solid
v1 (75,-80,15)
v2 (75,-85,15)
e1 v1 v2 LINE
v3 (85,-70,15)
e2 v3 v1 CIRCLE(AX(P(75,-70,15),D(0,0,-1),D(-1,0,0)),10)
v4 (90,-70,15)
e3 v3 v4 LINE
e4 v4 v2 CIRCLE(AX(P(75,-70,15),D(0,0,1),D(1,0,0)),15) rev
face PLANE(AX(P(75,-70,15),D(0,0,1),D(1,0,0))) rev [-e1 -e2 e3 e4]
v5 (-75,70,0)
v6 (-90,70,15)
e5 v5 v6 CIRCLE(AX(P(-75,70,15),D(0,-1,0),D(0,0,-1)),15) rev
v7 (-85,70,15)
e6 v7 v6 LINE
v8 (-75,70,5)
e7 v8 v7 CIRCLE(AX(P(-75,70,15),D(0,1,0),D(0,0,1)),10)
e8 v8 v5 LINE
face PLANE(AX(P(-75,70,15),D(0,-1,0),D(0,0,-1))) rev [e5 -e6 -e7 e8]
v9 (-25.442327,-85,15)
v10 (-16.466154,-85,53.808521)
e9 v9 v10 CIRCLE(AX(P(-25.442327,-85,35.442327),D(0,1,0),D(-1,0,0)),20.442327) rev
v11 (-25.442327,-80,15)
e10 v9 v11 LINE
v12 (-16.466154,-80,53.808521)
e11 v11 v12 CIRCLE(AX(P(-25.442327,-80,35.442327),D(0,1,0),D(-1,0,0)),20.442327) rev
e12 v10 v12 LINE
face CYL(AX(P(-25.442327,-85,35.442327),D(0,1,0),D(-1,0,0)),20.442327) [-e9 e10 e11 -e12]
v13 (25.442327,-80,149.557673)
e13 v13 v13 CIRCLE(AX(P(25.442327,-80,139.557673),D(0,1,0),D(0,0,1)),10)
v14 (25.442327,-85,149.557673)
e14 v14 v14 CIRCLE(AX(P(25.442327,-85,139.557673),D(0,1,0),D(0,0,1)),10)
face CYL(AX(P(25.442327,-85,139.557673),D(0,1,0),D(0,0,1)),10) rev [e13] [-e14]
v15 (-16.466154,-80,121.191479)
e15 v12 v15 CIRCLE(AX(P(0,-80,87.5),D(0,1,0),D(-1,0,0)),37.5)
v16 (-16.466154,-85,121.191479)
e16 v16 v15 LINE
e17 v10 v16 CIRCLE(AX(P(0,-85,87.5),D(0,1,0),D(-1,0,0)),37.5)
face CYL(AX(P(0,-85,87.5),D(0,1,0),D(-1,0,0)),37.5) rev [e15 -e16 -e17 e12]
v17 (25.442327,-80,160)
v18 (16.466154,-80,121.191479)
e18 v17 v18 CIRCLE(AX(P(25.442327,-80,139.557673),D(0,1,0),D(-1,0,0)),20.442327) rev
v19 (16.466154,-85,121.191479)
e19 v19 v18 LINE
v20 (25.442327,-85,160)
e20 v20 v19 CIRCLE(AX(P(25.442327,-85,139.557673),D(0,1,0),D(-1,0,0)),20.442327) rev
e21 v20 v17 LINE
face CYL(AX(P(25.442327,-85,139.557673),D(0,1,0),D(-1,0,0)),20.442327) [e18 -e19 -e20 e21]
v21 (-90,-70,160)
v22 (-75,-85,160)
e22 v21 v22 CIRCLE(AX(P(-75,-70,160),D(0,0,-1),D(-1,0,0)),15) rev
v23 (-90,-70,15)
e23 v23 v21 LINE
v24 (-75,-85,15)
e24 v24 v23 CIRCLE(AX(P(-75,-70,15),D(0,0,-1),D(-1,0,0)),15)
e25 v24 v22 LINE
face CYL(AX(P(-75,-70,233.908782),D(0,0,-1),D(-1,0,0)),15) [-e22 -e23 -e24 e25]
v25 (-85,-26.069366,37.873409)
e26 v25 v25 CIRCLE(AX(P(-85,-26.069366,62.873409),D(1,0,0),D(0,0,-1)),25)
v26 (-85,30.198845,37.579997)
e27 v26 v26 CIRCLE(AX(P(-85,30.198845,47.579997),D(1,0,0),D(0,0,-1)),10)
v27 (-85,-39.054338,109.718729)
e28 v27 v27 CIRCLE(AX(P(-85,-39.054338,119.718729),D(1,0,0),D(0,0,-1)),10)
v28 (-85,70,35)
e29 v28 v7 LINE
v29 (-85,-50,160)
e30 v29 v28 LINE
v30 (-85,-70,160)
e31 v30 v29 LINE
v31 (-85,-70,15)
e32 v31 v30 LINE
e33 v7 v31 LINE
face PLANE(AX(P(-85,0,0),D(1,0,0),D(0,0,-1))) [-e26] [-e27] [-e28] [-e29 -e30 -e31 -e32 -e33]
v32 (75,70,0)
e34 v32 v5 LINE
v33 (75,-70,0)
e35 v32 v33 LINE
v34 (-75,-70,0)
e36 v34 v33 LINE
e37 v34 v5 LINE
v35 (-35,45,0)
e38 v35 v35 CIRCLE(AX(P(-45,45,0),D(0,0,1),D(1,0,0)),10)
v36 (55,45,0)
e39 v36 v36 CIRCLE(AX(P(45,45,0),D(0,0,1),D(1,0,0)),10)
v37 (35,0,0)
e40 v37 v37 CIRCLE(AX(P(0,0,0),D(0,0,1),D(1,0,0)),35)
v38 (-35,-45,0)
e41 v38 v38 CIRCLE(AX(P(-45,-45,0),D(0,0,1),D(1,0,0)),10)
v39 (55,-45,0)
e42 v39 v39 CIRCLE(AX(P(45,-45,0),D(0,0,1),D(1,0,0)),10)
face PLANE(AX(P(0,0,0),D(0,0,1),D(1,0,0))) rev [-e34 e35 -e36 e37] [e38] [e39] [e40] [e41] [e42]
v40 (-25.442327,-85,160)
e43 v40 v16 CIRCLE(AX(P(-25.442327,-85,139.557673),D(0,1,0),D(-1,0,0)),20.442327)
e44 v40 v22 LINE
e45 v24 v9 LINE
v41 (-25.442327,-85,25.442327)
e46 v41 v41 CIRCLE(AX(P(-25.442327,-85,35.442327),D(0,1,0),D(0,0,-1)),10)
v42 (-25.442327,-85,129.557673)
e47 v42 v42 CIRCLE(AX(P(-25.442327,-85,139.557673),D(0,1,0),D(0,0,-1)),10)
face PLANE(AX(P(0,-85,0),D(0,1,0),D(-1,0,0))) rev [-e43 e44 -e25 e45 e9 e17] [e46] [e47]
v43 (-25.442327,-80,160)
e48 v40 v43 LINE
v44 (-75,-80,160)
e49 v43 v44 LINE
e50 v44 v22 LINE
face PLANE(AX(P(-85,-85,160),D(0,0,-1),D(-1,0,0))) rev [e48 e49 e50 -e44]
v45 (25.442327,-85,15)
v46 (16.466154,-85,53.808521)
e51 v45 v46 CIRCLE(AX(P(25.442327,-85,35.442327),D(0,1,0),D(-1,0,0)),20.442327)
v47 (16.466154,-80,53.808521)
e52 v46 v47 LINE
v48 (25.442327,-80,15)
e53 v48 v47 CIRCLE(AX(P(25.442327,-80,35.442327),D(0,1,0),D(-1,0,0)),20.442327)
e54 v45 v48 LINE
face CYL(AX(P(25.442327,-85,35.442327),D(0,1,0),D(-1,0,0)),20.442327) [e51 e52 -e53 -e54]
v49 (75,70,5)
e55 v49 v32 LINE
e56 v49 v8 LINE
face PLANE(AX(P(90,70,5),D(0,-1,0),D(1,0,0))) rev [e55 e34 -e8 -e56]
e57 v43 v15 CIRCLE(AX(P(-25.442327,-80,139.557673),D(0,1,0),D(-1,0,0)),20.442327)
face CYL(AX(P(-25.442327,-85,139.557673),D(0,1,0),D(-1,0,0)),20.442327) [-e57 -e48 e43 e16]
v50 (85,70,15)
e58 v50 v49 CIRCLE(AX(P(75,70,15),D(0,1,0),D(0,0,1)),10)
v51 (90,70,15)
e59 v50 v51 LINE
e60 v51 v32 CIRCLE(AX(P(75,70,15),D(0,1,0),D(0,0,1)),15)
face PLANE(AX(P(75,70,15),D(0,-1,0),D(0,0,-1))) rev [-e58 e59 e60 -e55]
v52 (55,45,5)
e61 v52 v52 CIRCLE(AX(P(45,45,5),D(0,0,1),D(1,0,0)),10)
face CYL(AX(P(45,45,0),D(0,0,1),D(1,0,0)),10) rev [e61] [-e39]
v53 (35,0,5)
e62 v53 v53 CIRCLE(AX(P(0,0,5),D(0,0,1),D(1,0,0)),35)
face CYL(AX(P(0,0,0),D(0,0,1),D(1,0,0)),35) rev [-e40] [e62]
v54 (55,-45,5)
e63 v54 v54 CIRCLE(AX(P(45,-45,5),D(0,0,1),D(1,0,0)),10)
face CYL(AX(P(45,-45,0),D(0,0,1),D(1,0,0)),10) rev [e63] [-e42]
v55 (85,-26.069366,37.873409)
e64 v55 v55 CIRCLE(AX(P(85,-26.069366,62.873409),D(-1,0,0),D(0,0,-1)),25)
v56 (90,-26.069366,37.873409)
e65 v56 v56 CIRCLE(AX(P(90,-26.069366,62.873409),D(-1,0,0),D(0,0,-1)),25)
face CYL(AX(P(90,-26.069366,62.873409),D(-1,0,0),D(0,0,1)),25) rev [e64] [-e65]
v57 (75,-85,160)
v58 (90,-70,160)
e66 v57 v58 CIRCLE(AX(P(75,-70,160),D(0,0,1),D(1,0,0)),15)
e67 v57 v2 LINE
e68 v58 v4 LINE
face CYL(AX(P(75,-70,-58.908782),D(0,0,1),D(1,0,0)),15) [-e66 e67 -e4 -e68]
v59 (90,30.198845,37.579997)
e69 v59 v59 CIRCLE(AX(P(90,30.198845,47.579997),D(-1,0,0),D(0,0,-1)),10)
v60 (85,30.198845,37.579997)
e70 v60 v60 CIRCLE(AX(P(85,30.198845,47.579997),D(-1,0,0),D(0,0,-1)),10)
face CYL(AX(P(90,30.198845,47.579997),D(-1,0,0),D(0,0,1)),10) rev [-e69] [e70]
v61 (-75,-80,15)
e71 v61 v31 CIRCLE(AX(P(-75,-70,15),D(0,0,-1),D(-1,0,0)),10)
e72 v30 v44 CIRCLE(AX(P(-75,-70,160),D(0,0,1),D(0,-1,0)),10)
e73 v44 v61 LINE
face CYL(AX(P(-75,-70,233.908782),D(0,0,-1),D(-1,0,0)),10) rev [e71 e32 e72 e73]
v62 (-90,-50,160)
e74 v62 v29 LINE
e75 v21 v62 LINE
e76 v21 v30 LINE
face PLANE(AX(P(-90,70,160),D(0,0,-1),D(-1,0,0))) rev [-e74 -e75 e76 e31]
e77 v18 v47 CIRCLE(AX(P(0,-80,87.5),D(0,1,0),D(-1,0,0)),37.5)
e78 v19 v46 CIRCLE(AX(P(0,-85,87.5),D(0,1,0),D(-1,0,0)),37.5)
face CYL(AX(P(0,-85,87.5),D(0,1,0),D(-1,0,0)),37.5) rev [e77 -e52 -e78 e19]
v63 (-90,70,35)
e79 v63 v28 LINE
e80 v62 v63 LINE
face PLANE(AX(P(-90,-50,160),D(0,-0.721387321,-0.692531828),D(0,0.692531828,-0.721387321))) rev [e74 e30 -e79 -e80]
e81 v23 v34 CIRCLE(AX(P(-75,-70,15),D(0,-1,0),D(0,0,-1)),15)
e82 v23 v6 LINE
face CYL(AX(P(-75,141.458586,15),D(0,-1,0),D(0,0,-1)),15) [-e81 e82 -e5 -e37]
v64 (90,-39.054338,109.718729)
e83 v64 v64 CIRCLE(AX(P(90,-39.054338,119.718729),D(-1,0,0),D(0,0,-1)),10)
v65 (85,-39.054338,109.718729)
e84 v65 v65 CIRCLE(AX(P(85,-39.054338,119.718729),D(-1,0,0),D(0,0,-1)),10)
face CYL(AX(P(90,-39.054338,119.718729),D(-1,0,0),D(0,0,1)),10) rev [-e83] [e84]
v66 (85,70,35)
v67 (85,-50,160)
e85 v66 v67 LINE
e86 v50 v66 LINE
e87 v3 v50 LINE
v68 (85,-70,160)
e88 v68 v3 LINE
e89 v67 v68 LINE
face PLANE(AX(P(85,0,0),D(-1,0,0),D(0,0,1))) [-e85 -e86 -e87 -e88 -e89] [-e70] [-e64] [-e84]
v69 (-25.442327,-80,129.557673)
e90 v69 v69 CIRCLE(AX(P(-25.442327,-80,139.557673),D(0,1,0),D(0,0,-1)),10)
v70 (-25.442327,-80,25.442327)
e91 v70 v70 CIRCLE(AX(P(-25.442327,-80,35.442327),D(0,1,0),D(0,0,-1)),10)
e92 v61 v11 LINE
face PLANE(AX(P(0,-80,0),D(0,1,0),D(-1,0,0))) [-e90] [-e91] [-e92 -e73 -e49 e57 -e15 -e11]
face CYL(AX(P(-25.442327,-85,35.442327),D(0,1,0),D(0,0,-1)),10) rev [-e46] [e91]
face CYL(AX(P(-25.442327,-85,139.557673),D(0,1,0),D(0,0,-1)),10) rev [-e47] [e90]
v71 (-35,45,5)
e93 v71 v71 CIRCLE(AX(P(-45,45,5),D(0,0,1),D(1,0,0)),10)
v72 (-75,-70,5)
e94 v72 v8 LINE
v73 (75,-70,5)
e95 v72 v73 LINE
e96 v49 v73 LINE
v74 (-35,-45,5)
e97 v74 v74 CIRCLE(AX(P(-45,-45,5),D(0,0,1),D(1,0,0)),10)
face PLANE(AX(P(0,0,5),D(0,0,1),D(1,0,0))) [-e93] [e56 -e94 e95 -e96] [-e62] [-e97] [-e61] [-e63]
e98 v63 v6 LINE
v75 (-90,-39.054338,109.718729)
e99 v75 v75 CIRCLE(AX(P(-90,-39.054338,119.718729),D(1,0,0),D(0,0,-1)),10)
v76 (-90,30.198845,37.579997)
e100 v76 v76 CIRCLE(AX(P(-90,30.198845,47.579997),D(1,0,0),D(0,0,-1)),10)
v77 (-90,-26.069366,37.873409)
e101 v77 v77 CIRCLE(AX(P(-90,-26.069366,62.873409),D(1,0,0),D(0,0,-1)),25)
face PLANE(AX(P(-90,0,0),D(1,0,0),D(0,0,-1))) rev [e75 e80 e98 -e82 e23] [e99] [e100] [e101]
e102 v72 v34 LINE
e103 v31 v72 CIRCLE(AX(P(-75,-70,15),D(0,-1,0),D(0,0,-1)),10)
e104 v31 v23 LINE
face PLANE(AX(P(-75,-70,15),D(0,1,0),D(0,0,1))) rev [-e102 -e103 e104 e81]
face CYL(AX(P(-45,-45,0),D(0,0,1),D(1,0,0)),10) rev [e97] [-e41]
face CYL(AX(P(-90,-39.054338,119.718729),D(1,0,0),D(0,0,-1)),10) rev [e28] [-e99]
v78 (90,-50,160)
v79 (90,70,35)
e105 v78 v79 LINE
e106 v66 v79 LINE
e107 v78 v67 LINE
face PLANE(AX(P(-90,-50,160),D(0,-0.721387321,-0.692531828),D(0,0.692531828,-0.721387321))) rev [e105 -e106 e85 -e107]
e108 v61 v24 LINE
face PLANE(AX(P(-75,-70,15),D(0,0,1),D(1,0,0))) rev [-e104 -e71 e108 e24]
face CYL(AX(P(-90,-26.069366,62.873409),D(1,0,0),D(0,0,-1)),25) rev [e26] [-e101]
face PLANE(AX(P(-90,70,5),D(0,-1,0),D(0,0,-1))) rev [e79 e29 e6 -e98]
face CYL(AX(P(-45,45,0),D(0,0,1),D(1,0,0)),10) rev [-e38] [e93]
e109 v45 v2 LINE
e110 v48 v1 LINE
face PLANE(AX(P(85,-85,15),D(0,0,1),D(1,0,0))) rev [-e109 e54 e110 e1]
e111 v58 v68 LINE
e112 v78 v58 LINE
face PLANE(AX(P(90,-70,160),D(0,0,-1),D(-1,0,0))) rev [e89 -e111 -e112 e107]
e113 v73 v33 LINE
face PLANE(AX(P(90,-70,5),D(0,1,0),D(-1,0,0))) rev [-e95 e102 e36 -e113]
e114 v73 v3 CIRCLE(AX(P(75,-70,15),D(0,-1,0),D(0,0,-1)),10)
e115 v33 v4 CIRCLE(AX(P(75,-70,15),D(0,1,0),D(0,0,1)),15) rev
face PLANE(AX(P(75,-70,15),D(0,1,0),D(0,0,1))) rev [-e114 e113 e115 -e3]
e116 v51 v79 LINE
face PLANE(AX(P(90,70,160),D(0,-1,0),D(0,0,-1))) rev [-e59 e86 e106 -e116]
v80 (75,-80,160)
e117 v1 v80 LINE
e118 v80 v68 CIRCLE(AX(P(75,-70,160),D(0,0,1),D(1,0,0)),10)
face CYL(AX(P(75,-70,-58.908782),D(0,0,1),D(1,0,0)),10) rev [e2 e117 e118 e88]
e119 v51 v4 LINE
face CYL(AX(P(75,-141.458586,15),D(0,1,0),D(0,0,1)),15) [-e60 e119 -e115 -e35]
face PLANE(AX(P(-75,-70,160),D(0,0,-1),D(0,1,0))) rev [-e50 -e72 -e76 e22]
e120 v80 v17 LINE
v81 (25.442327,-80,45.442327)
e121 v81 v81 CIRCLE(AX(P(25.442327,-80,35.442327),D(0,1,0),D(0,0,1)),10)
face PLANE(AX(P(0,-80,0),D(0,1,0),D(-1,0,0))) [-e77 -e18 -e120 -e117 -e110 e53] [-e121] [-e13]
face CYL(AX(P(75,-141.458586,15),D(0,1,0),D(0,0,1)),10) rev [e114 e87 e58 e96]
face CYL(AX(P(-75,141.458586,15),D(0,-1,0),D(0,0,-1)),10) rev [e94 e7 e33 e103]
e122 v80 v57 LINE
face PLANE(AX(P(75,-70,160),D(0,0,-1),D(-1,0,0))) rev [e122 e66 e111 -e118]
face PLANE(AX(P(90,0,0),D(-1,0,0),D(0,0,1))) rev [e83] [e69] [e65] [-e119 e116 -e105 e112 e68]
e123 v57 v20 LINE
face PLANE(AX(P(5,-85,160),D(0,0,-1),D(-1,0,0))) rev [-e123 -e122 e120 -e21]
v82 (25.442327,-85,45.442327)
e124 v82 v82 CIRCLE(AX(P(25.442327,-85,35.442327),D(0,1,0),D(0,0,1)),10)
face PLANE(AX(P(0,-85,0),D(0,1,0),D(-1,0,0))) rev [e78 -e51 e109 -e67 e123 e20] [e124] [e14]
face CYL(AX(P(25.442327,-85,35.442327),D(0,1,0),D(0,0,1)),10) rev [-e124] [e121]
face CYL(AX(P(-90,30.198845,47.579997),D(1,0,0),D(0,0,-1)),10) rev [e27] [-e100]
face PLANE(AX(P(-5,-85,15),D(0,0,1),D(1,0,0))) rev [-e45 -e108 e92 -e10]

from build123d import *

# Parameters (mm, degrees)
SKETCH1_W                      = 180
SKETCH1_H                      = 140
BASE_FLANGE1_DEPTH             = 5
EDGE_FLANGE1_STRIP_W           = 40
EDGE_FLANGE1_STRIP_H           = 5
EDGE_FLANGE1_STRIP_CUT_DEPTH   = 140
EDGE_FLANGE1_STRIP_2_W         = 40
EDGE_FLANGE1_STRIP_2_H         = 5
EDGE_FLANGE1_STRIP_CUT_2_DEPTH = 140
EDGE_FLANGE1_DEPTH             = 140
EDGE_FLANGE1_BEND_DEPTH        = 140
EDGE_FLANGE2_DEPTH             = 145
EDGE_FLANGE2_BEND_DEPTH        = 145
CUT_EXTRUDE1_DEPTH             = 256.391855782
CUT_EXTRUDE3_DEPTH             = 10
UNFOLD2_START                  = -85
UNFOLD2_DEPTH                  = 155
UNFOLD2_START_2                = -127.134954085
UNFOLD2_2_OUTLINE_W            = 145
UNFOLD2_2_OUTLINE_H            = 5
UNFOLD2_2_DEPTH                = 77.134954085
UNFOLD2_START_3                = -70
UNFOLD2_3_DEPTH                = 140
UNFOLD2_4_DEPTH                = 5
SKETCH24_R                     = 10
SKETCH24_R_2                   = 25
SKETCH24_R_3                   = 35
CUT_EXTRUDE4_DEPTH             = 10
FOLD1_START                    = -161
FOLD1_DEPTH                    = 231
FOLD1_START_2                  = -85
FOLD1_2_OUTLINE_R              = 10
FOLD1_2_DEPTH                  = 15
FOLD1_START_3                  = -70
FOLD1_3_DEPTH                  = 140
FOLD1_START_4                  = -75
FOLD1_4_OUTLINE_W              = 10
FOLD1_4_OUTLINE_H              = 145
FOLD1_4_DEPTH                  = 150
FOLD1_START_5                  = -90
FOLD1_5_OUTLINE_R              = 25
FOLD1_5_OUTLINE_R_2            = 10
FOLD1_5_DEPTH                  = 180
FOLD1_6_OUTLINE_W              = 5
FOLD1_6_OUTLINE_H              = 145
FOLD1_6_DEPTH                  = 2.982774194
FOLD1_START_6                  = 87.176322581
FOLD1_7_OUTLINE_W              = 5
FOLD1_7_OUTLINE_H              = 145
FOLD1_7_DEPTH                  = 2.823677419
FOLD1_START_7                  = 15
FOLD1_8_DEPTH                  = 145


with BuildPart() as part:
    # Base-Flange1: sheet metal written as solids
    # Sketch1 → Base-Flange1 (new body)
    with BuildSketch(Plane.XY):
        Rectangle(SKETCH1_W, SKETCH1_H)
    extrude(amount=BASE_FLANGE1_DEPTH)

    # Edge-Flange1: sheet metal written as solids
    # Edge-Flange1 strip (on a plane across the edge) → Edge-Flange1 strip cut (cut)
    with BuildSketch(Plane(origin=(-90, 70, 5), x_dir=(1, 0, 0), z_dir=(0, -1, 0))):
        with Locations((-5, -2.5)):
            Rectangle(EDGE_FLANGE1_STRIP_W, EDGE_FLANGE1_STRIP_H)
    extrude(amount=EDGE_FLANGE1_STRIP_CUT_DEPTH, mode=Mode.SUBTRACT)

    # Edge-Flange1 strip 2 (on a plane across the edge) → Edge-Flange1 strip cut 2 (cut)
    with BuildSketch(Plane(origin=(90, -70, 5), x_dir=(-1, 0, 0), z_dir=(0, 1, 0))):
        with Locations((-5, -2.5)):
            Rectangle(EDGE_FLANGE1_STRIP_2_W, EDGE_FLANGE1_STRIP_2_H)
    extrude(amount=EDGE_FLANGE1_STRIP_CUT_2_DEPTH, mode=Mode.SUBTRACT)

    # Edge-Flange1 section (on a plane across the edge) → Edge-Flange1 (add)
    with BuildSketch(Plane(origin=(-90, 70, 5), x_dir=(1, 0, 0), z_dir=(0, -1, 0))):
        with BuildLine():
            Line((0, 10), (0, 155))
            Line((0, 155), (5, 155))
            Line((5, 155), (5, 10))
            ThreePointArc((5, 10), (7.928932188, 2.928932188), (15, 0))
            Line((15, 0), (15, -5))
            ThreePointArc((15, -5), (4.393398282, -0.606601718), (0, 10))
        make_face()
    extrude(amount=EDGE_FLANGE1_DEPTH)

    # Edge-Flange1 section 2 (on a plane across the edge) → Edge-Flange1 bend (add)
    with BuildSketch(Plane(origin=(90, -70, 5), x_dir=(-1, 0, 0), z_dir=(0, 1, 0))):
        with BuildLine():
            Line((0, 10), (0, 155))
            Line((0, 155), (5, 155))
            Line((5, 155), (5, 10))
            ThreePointArc((5, 10), (7.928932188, 2.928932188), (15, 0))
            Line((15, 0), (15, -5))
            ThreePointArc((15, -5), (4.393398282, -0.606601718), (0, 10))
        make_face()
    extrude(amount=EDGE_FLANGE1_BEND_DEPTH)

    # Edge-Flange2: sheet metal written as solids
    # Edge-Flange2 section (on a plane across the edge) → Edge-Flange2 (add)
    with BuildSketch(Plane(origin=(-85, -80, 160), x_dir=(0, 1, 0), z_dir=(0, 0, -1))):
        with BuildLine():
            Line((-5, 10), (-5, 80))
            Line((-5, 80), (0, 80))
            Line((0, 80), (0, 10))
            ThreePointArc((0, 10), (2.928932188, 2.928932188), (10, 0))
            Line((10, 0), (10, -5))
            ThreePointArc((10, -5), (-0.606601718, -0.606601718), (-5, 10))
        make_face()
    extrude(amount=EDGE_FLANGE2_DEPTH)

    # Edge-Flange2 section 2 (on a plane across the edge) → Edge-Flange2 bend (add)
    with BuildSketch(Plane(origin=(85, -80, 15), x_dir=(0, 1, 0), z_dir=(0, 0, 1))):
        with BuildLine():
            Line((-5, 10), (-5, 80))
            Line((-5, 80), (0, 80))
            Line((0, 80), (0, 10))
            ThreePointArc((0, 10), (2.928932188, 2.928932188), (10, 0))
            Line((10, 0), (10, -5))
            ThreePointArc((10, -5), (-0.606601718, -0.606601718), (-5, 10))
        make_face()
    extrude(amount=EDGE_FLANGE2_BEND_DEPTH)

    # Sketch18 → Cut-Extrude1 (cut, through all)
    with BuildSketch(Plane(origin=(90, 0, 0), x_dir=(0, 0, -1), z_dir=(1, 0, 0))):
        Polygon((-35, 70), (-160, 70), (-160, -50), align=None)
    extrude(amount=-CUT_EXTRUDE1_DEPTH, mode=Mode.SUBTRACT)

    # Sketch19 → Cut-Extrude3 (cut)
    with BuildSketch(Plane(origin=(0, -80, 0), x_dir=(1, 0, 0), z_dir=(0, 1, 0))):
        with BuildLine():
            ThreePointArc((-25.442327374, -15), (-10.987419064, -20.987419064), (-5, -35.442327374))
            Line((-5, -35.442327374), (-5, -15))
            Line((-5, -15), (-25.442327374, -15))
        make_face()
        with BuildLine():
            Line((25.442327374, -15), (5, -15))
            Line((5, -15), (5, -35.442327365))
            ThreePointArc((5, -35.442327365), (10.987419068, -20.987419061), (25.442327374, -15))
        make_face()
        with BuildLine():
            ThreePointArc((-16.466153842, -121.191479303), (-8.101874289, -128.731896198), (-5, -139.557672626))
            Line((-5, -139.557672626), (-5, -35.442327374))
            ThreePointArc((-5, -35.442327374), (-8.101874289, -46.268103802), (-16.466153842, -53.808520697))
            ThreePointArc((-16.466153842, -53.808520697), (-37.5, -87.5), (-16.466153842, -121.191479303))
        make_face()
        with BuildLine():
            ThreePointArc((16.466153842, -53.808520697), (8.101874287, -46.268103798), (5, -35.442327365))
            Line((5, -35.442327365), (5, -139.557672626))
            ThreePointArc((5, -139.557672626), (8.101874289, -128.731896198), (16.466153842, -121.191479303))
            ThreePointArc((16.466153842, -121.191479303), (37.5, -87.5), (16.466153842, -53.808520697))
        make_face()
        with BuildLine():
            Line((-25.442327374, -160), (-5, -160))
            Line((-5, -160), (-5, -139.557672626))
            ThreePointArc((-5, -139.557672626), (-10.987419064, -154.012580936), (-25.442327374, -160))
        make_face()
        with BuildLine():
            ThreePointArc((25.442327374, -160), (10.987419064, -154.012580936), (5, -139.557672626))
            Line((5, -139.557672626), (5, -160))
            Line((5, -160), (25.442327374, -160))
        make_face()
    extrude(amount=-CUT_EXTRUDE3_DEPTH, mode=Mode.SUBTRACT)

    # Unfold2: read off the stored shape, not the designer's step
    # Unfold2 outline → Unfold2 (cut)
    with BuildSketch(Plane(origin=(0, 0, 0), x_dir=(1, 0, 0), z_dir=(0, 1, 0)).offset(UNFOLD2_START)):
        with BuildLine():
            Line((86.180339888, -5), (75, -5))
            ThreePointArc((75, -5), (82.071067812, -7.928932188), (85, -15))
            Line((85, -15), (25.442327374, -15))
            ThreePointArc((25.442327374, -15), (5.525795485, -30.835755333), (16.466153842, -53.808520697))
            ThreePointArc((16.466153842, -53.808520697), (37.5, -87.5), (16.466153842, -121.191479303))
            ThreePointArc((16.466153842, -121.191479303), (5.525795485, -144.164244667), (25.442327374, -160))
            Line((25.442327374, -160), (90, -160))
            Line((90, -160), (90, -15))
            ThreePointArc((90, -15), (89.012585385, -9.647668653), (86.180339888, -5))
        make_face()
        with BuildLine():
            Line((-75, -5), (-86.180339888, -5))
            ThreePointArc((-86.180339888, -5), (-89.012585385, -9.647668653), (-90, -15))
            Line((-90, -15), (-90, -160))
            Line((-90, -160), (-25.442327374, -160))
            ThreePointArc((-25.442327374, -160), (-5.525795485, -144.164244667), (-16.466153842, -121.191479303))
            ThreePointArc((-16.466153842, -121.191479303), (-37.5, -87.5), (-16.466153842, -53.808520697))
            ThreePointArc((-16.466153842, -53.808520697), (-5.525795485, -30.835755333), (-25.442327374, -15))
            Line((-25.442327374, -15), (-85, -15))
            ThreePointArc((-85, -15), (-82.071067812, -7.928932188), (-75, -5))
        make_face()
    extrude(amount=UNFOLD2_DEPTH, mode=Mode.SUBTRACT)



with BuildPart() as body_2:
    # Unfold2 2 outline → Unfold2 2 (new body)
    with BuildSketch(Plane(origin=(0, 0, 0), x_dir=(1, 0, 0), z_dir=(0, 1, 0)).offset(UNFOLD2_START_2)):
        with Locations((167.134954085, -2.5)):
            Rectangle(UNFOLD2_2_OUTLINE_W, UNFOLD2_2_OUTLINE_H)
        with Locations((-167.134954085, -2.5)):
            Rectangle(UNFOLD2_2_OUTLINE_W, UNFOLD2_2_OUTLINE_H)
    extrude(amount=UNFOLD2_2_DEPTH)


with BuildPart() as part_1:
    add(part.part)

    add(body_2.part)  # Unfold2 3 merges body 2
    # Unfold2 3 outline → Unfold2 3 (add)
    with BuildSketch(Plane(origin=(0, 0, 0), x_dir=(1, 0, 0), z_dir=(0, 1, 0)).offset(UNFOLD2_START_3)):
        with BuildLine():
            ThreePointArc((75, 0), (81.123724357, -1.306936062), (86.180339888, -5))
            Line((86.180339888, -5), (94.634954085, -5))
            Line((94.634954085, -5), (94.634954085, 0))
            Line((94.634954085, 0), (75, 0))
        make_face()
        with BuildLine():
            Line((-94.634954085, 0), (-94.634954085, -5))
            Line((-94.634954085, -5), (-86.180339888, -5))
            ThreePointArc((-86.180339888, -5), (-81.123724357, -1.306936062), (-75, 0))
            Line((-75, 0), (-94.634954085, 0))
        make_face()
    extrude(amount=UNFOLD2_3_DEPTH)

    # Unfold2 4 outline → Unfold2 4 (add)
    with BuildSketch(Plane.XY):
        Polygon((114.634954085, 70), (94.634954085, 70), (94.634954085, -50), (239.634954085, -50), align=None)
        Polygon((-94.634954085, 70), (-114.634954085, 70), (-239.634954085, -50), (-94.634954085, -50), align=None)
        with BuildLine():
            ThreePointArc((133.443474782, -148.168800243), (147.275834791, -132.825122573), (167.134953866, -127.134954085))
            Line((167.134953866, -127.134954085), (94.634954085, -127.134954085))
            Line((94.634954085, -127.134954085), (94.634954085, -139.192626711))
            ThreePointArc((94.634954085, -139.192626711), (110.470709418, -159.1091586), (133.443474782, -148.168800243))
        make_face()
        with BuildLine():
            ThreePointArc((167.134953866, -127.134954085), (186.994073194, -132.825122457), (200.826433388, -148.168800243))
            ThreePointArc((200.826433388, -148.168800243), (223.799198752, -159.1091586), (239.634954085, -139.192626711))
            Line((239.634954085, -139.192626711), (239.634954085, -127.134954085))
            Line((239.634954085, -127.134954085), (167.134953866, -127.134954085))
        make_face()
        with BuildLine():
            ThreePointArc((-200.826433388, -148.168800243), (-186.994073379, -132.825122573), (-167.134954304, -127.134954085))
            Line((-167.134954304, -127.134954085), (-239.634954085, -127.134954085))
            Line((-239.634954085, -127.134954085), (-239.634954085, -139.192626711))
            ThreePointArc((-239.634954085, -139.192626711), (-223.799198752, -159.1091586), (-200.826433388, -148.168800243))
        make_face()
        with BuildLine():
            ThreePointArc((-167.134954304, -127.134954085), (-147.275834976, -132.825122457), (-133.443474782, -148.168800243))
            ThreePointArc((-133.443474782, -148.168800243), (-110.470709418, -159.1091586), (-94.634954085, -139.192626711))
            Line((-94.634954085, -139.192626711), (-94.634954085, -127.134954085))
            Line((-94.634954085, -127.134954085), (-167.134954304, -127.134954085))
        make_face()
    extrude(amount=UNFOLD2_4_DEPTH)

    # Sketch24 → Cut-Extrude4 (cut)
    with BuildSketch(Plane.XY.offset(5)):
        with Locations((-219.192626711, -139.192626711)):
            Circle(SKETCH24_R)
        with Locations((-115.077281458, -139.192626711)):
            Circle(SKETCH24_R)
        with Locations((115.077281458, -139.192626711)):
            Circle(SKETCH24_R)
        with Locations((-45, -45)):
            Circle(SKETCH24_R)
        with Locations((45, -45)):
            Circle(SKETCH24_R)
        with Locations((219.192626711, -139.192626711)):
            Circle(SKETCH24_R)
        with Locations((-45, 45)):
            Circle(SKETCH24_R)
        with Locations((45, 45)):
            Circle(SKETCH24_R)
        with Locations((-199.353683573, -39.05433783)):
            Circle(SKETCH24_R)
        with Locations((-127.21495147, 30.198844989)):
            Circle(SKETCH24_R)
        with Locations((-142.508362675, -26.069366052)):
            Circle(SKETCH24_R_2)
        Circle(SKETCH24_R_3)
        with Locations(Location((142.508362675, -26.069366052, 0), (0, 0, 180))):
            Circle(SKETCH24_R_2)
        with Locations(Location((199.353683573, -39.05433783, 0), (0, 0, 180))):
            Circle(SKETCH24_R)
        with Locations(Location((127.21495147, 30.198844989, 0), (0, 0, 180))):
            Circle(SKETCH24_R)
    extrude(amount=-CUT_EXTRUDE4_DEPTH, mode=Mode.SUBTRACT)

    # Fold1: read off the stored shape, not the designer's step
    # Fold1 outline → Fold1 (cut)
    with BuildSketch(Plane(origin=(0, 0, 0), x_dir=(1, 0, 0), z_dir=(0, 1, 0)).offset(FOLD1_START)):
        with BuildLine():
            ThreePointArc((75, 0), (81.123724357, -1.306936062), (86.180339888, -5))
            Line((86.180339888, -5), (239.634954085, -5))
            Line((239.634954085, -5), (239.634954085, 0))
            Line((239.634954085, 0), (75, 0))
        make_face()
        with BuildLine():
            ThreePointArc((-86.180339888, -5), (-81.123724357, -1.306936062), (-75, 0))
            Line((-75, 0), (-239.634954085, 0))
            Line((-239.634954085, 0), (-239.634954085, -5))
            Line((-239.634954085, -5), (-86.180339888, -5))
        make_face()
    extrude(amount=FOLD1_DEPTH, mode=Mode.SUBTRACT)



with BuildPart() as body_2_2:
    # Fold1 2 outline → Fold1 2 (new body)
    # profile 1 of 2: a face of its own
    with BuildSketch(Plane(origin=(0, 0, 0), x_dir=(1, 0, 0), z_dir=(0, 1, 0)).offset(FOLD1_START_2)):
        with BuildLine():
            Line((90, -160), (90, -15))
            Line((90, -15), (25.442327374, -15))
            ThreePointArc((25.442327374, -15), (5.525795485, -30.835755333), (16.466153842, -53.808520697))
            ThreePointArc((16.466153842, -53.808520697), (37.5, -87.5), (16.466153842, -121.191479303))
            ThreePointArc((16.466153842, -121.191479303), (5.525795485, -144.164244667), (25.442327374, -160))
            Line((25.442327374, -160), (90, -160))
        make_face()
        with Locations((25.442327374, -139.557672626)):
            Circle(FOLD1_2_OUTLINE_R, mode=Mode.SUBTRACT)
        with Locations((25.442327374, -35.442327374)):
            Circle(FOLD1_2_OUTLINE_R, mode=Mode.SUBTRACT)
    # profile 2 of 2: a face of its own
    with BuildSketch(Plane(origin=(0, 0, 0), x_dir=(1, 0, 0), z_dir=(0, 1, 0)).offset(FOLD1_START_2)):
        with BuildLine():
            ThreePointArc((-16.466153842, -121.191479303), (-37.5, -87.5), (-16.466153842, -53.808520697))
            ThreePointArc((-16.466153842, -53.808520697), (-5.525795485, -30.835755333), (-25.442327374, -15))
            Line((-25.442327374, -15), (-90, -15))
            Line((-90, -15), (-90, -160))
            Line((-90, -160), (-25.442327374, -160))
            ThreePointArc((-25.442327374, -160), (-5.525795485, -144.164244667), (-16.466153842, -121.191479303))
        make_face()
        with Locations((-25.442327374, -139.557672626)):
            Circle(FOLD1_2_OUTLINE_R, mode=Mode.SUBTRACT)
        with Locations((-25.442327374, -35.442327374)):
            Circle(FOLD1_2_OUTLINE_R, mode=Mode.SUBTRACT)
    extrude(amount=FOLD1_2_DEPTH)


with BuildPart() as part_2:
    add(part_1.part)

    add(body_2_2.part)  # Fold1 3 merges body 2 2
    # Fold1 3 outline → Fold1 3 (add)
    with BuildSketch(Plane(origin=(0, 0, 0), x_dir=(1, 0, 0), z_dir=(0, 1, 0)).offset(FOLD1_START_3)):
        with BuildLine():
            ThreePointArc((75, -5), (82.071067812, -7.928932188), (85, -15))
            Line((85, -15), (85, -160))
            Line((85, -160), (90, -160))
            Line((90, -160), (90, -15))
            ThreePointArc((90, -15), (89.012585385, -9.647668653), (86.180339888, -5))
            Line((86.180339888, -5), (75, -5))
        make_face()
        with BuildLine():
            Line((-85, -160), (-85, -15))
            ThreePointArc((-85, -15), (-82.071067812, -7.928932188), (-75, -5))
            Line((-75, -5), (-86.180339888, -5))
            ThreePointArc((-86.180339888, -5), (-89.012585385, -9.647668653), (-90, -15))
            Line((-90, -15), (-90, -160))
            Line((-90, -160), (-85, -160))
        make_face()
    extrude(amount=FOLD1_3_DEPTH)

    # Fold1 4 outline → Fold1 4 (cut)
    with BuildSketch(Plane.YZ.offset(FOLD1_START_4)):
        with Locations((-75, 87.5)):
            Rectangle(FOLD1_4_OUTLINE_W, FOLD1_4_OUTLINE_H)
    extrude(amount=FOLD1_4_DEPTH, mode=Mode.SUBTRACT)

    # Fold1 5 outline → Fold1 5 (cut)
    with BuildSketch(Plane.YZ.offset(FOLD1_START_5)):
        Polygon((70, 160), (-50, 160), (70, 35), align=None)
        with Locations((-26.069366052, 62.873408591)):
            Circle(FOLD1_5_OUTLINE_R)
        with Locations((-39.05433783, 119.718729488)):
            Circle(FOLD1_5_OUTLINE_R_2)
        with Locations((30.198844989, 47.579997385)):
            Circle(FOLD1_5_OUTLINE_R_2)
    extrude(amount=FOLD1_5_DEPTH, mode=Mode.SUBTRACT)

    # Fold1 6 outline → Fold1 6 (cut)
    with BuildSketch(Plane.YZ.offset(FOLD1_START_5)):
        with Locations((-82.5, 87.5)):
            Rectangle(FOLD1_6_OUTLINE_W, FOLD1_6_OUTLINE_H)
    extrude(amount=FOLD1_6_DEPTH, mode=Mode.SUBTRACT)

    # Fold1 7 outline → Fold1 7 (cut)
    with BuildSketch(Plane.YZ.offset(FOLD1_START_6)):
        with Locations((-82.5, 87.5)):
            Rectangle(FOLD1_7_OUTLINE_W, FOLD1_7_OUTLINE_H)
    extrude(amount=FOLD1_7_DEPTH, mode=Mode.SUBTRACT)

    # Fold1 8 outline → Fold1 8 (cut)
    with BuildSketch(Plane.XY.offset(FOLD1_START_7)):
        with BuildLine():
            ThreePointArc((90, -70), (85.606601718, -80.606601718), (75, -85))
            Line((75, -85), (87.176322581, -85))
            Line((87.176322581, -85), (87.176322581, -80))
            Line((87.176322581, -80), (90, -80))
            Line((90, -80), (90, -70))
        make_face()
        with BuildLine():
            Line((75, -70), (75, -80))
            ThreePointArc((75, -80), (82.071067812, -77.071067812), (85, -70))
            Line((85, -70), (75, -70))
        make_face()
        with BuildLine():
            Line((-87.017225806, -85), (-75, -85))
            ThreePointArc((-75, -85), (-85.606601718, -80.606601718), (-90, -70))
            Line((-90, -70), (-90, -80))
            Line((-90, -80), (-87.017225806, -80))
            Line((-87.017225806, -80), (-87.017225806, -85))
        make_face()
        with BuildLine():
            ThreePointArc((-85, -70), (-82.071067812, -77.071067812), (-75, -80))
            Line((-75, -80), (-75, -70))
            Line((-75, -70), (-85, -70))
        make_face()
    extrude(amount=FOLD1_8_DEPTH, mode=Mode.SUBTRACT)


solid = part_2.part
